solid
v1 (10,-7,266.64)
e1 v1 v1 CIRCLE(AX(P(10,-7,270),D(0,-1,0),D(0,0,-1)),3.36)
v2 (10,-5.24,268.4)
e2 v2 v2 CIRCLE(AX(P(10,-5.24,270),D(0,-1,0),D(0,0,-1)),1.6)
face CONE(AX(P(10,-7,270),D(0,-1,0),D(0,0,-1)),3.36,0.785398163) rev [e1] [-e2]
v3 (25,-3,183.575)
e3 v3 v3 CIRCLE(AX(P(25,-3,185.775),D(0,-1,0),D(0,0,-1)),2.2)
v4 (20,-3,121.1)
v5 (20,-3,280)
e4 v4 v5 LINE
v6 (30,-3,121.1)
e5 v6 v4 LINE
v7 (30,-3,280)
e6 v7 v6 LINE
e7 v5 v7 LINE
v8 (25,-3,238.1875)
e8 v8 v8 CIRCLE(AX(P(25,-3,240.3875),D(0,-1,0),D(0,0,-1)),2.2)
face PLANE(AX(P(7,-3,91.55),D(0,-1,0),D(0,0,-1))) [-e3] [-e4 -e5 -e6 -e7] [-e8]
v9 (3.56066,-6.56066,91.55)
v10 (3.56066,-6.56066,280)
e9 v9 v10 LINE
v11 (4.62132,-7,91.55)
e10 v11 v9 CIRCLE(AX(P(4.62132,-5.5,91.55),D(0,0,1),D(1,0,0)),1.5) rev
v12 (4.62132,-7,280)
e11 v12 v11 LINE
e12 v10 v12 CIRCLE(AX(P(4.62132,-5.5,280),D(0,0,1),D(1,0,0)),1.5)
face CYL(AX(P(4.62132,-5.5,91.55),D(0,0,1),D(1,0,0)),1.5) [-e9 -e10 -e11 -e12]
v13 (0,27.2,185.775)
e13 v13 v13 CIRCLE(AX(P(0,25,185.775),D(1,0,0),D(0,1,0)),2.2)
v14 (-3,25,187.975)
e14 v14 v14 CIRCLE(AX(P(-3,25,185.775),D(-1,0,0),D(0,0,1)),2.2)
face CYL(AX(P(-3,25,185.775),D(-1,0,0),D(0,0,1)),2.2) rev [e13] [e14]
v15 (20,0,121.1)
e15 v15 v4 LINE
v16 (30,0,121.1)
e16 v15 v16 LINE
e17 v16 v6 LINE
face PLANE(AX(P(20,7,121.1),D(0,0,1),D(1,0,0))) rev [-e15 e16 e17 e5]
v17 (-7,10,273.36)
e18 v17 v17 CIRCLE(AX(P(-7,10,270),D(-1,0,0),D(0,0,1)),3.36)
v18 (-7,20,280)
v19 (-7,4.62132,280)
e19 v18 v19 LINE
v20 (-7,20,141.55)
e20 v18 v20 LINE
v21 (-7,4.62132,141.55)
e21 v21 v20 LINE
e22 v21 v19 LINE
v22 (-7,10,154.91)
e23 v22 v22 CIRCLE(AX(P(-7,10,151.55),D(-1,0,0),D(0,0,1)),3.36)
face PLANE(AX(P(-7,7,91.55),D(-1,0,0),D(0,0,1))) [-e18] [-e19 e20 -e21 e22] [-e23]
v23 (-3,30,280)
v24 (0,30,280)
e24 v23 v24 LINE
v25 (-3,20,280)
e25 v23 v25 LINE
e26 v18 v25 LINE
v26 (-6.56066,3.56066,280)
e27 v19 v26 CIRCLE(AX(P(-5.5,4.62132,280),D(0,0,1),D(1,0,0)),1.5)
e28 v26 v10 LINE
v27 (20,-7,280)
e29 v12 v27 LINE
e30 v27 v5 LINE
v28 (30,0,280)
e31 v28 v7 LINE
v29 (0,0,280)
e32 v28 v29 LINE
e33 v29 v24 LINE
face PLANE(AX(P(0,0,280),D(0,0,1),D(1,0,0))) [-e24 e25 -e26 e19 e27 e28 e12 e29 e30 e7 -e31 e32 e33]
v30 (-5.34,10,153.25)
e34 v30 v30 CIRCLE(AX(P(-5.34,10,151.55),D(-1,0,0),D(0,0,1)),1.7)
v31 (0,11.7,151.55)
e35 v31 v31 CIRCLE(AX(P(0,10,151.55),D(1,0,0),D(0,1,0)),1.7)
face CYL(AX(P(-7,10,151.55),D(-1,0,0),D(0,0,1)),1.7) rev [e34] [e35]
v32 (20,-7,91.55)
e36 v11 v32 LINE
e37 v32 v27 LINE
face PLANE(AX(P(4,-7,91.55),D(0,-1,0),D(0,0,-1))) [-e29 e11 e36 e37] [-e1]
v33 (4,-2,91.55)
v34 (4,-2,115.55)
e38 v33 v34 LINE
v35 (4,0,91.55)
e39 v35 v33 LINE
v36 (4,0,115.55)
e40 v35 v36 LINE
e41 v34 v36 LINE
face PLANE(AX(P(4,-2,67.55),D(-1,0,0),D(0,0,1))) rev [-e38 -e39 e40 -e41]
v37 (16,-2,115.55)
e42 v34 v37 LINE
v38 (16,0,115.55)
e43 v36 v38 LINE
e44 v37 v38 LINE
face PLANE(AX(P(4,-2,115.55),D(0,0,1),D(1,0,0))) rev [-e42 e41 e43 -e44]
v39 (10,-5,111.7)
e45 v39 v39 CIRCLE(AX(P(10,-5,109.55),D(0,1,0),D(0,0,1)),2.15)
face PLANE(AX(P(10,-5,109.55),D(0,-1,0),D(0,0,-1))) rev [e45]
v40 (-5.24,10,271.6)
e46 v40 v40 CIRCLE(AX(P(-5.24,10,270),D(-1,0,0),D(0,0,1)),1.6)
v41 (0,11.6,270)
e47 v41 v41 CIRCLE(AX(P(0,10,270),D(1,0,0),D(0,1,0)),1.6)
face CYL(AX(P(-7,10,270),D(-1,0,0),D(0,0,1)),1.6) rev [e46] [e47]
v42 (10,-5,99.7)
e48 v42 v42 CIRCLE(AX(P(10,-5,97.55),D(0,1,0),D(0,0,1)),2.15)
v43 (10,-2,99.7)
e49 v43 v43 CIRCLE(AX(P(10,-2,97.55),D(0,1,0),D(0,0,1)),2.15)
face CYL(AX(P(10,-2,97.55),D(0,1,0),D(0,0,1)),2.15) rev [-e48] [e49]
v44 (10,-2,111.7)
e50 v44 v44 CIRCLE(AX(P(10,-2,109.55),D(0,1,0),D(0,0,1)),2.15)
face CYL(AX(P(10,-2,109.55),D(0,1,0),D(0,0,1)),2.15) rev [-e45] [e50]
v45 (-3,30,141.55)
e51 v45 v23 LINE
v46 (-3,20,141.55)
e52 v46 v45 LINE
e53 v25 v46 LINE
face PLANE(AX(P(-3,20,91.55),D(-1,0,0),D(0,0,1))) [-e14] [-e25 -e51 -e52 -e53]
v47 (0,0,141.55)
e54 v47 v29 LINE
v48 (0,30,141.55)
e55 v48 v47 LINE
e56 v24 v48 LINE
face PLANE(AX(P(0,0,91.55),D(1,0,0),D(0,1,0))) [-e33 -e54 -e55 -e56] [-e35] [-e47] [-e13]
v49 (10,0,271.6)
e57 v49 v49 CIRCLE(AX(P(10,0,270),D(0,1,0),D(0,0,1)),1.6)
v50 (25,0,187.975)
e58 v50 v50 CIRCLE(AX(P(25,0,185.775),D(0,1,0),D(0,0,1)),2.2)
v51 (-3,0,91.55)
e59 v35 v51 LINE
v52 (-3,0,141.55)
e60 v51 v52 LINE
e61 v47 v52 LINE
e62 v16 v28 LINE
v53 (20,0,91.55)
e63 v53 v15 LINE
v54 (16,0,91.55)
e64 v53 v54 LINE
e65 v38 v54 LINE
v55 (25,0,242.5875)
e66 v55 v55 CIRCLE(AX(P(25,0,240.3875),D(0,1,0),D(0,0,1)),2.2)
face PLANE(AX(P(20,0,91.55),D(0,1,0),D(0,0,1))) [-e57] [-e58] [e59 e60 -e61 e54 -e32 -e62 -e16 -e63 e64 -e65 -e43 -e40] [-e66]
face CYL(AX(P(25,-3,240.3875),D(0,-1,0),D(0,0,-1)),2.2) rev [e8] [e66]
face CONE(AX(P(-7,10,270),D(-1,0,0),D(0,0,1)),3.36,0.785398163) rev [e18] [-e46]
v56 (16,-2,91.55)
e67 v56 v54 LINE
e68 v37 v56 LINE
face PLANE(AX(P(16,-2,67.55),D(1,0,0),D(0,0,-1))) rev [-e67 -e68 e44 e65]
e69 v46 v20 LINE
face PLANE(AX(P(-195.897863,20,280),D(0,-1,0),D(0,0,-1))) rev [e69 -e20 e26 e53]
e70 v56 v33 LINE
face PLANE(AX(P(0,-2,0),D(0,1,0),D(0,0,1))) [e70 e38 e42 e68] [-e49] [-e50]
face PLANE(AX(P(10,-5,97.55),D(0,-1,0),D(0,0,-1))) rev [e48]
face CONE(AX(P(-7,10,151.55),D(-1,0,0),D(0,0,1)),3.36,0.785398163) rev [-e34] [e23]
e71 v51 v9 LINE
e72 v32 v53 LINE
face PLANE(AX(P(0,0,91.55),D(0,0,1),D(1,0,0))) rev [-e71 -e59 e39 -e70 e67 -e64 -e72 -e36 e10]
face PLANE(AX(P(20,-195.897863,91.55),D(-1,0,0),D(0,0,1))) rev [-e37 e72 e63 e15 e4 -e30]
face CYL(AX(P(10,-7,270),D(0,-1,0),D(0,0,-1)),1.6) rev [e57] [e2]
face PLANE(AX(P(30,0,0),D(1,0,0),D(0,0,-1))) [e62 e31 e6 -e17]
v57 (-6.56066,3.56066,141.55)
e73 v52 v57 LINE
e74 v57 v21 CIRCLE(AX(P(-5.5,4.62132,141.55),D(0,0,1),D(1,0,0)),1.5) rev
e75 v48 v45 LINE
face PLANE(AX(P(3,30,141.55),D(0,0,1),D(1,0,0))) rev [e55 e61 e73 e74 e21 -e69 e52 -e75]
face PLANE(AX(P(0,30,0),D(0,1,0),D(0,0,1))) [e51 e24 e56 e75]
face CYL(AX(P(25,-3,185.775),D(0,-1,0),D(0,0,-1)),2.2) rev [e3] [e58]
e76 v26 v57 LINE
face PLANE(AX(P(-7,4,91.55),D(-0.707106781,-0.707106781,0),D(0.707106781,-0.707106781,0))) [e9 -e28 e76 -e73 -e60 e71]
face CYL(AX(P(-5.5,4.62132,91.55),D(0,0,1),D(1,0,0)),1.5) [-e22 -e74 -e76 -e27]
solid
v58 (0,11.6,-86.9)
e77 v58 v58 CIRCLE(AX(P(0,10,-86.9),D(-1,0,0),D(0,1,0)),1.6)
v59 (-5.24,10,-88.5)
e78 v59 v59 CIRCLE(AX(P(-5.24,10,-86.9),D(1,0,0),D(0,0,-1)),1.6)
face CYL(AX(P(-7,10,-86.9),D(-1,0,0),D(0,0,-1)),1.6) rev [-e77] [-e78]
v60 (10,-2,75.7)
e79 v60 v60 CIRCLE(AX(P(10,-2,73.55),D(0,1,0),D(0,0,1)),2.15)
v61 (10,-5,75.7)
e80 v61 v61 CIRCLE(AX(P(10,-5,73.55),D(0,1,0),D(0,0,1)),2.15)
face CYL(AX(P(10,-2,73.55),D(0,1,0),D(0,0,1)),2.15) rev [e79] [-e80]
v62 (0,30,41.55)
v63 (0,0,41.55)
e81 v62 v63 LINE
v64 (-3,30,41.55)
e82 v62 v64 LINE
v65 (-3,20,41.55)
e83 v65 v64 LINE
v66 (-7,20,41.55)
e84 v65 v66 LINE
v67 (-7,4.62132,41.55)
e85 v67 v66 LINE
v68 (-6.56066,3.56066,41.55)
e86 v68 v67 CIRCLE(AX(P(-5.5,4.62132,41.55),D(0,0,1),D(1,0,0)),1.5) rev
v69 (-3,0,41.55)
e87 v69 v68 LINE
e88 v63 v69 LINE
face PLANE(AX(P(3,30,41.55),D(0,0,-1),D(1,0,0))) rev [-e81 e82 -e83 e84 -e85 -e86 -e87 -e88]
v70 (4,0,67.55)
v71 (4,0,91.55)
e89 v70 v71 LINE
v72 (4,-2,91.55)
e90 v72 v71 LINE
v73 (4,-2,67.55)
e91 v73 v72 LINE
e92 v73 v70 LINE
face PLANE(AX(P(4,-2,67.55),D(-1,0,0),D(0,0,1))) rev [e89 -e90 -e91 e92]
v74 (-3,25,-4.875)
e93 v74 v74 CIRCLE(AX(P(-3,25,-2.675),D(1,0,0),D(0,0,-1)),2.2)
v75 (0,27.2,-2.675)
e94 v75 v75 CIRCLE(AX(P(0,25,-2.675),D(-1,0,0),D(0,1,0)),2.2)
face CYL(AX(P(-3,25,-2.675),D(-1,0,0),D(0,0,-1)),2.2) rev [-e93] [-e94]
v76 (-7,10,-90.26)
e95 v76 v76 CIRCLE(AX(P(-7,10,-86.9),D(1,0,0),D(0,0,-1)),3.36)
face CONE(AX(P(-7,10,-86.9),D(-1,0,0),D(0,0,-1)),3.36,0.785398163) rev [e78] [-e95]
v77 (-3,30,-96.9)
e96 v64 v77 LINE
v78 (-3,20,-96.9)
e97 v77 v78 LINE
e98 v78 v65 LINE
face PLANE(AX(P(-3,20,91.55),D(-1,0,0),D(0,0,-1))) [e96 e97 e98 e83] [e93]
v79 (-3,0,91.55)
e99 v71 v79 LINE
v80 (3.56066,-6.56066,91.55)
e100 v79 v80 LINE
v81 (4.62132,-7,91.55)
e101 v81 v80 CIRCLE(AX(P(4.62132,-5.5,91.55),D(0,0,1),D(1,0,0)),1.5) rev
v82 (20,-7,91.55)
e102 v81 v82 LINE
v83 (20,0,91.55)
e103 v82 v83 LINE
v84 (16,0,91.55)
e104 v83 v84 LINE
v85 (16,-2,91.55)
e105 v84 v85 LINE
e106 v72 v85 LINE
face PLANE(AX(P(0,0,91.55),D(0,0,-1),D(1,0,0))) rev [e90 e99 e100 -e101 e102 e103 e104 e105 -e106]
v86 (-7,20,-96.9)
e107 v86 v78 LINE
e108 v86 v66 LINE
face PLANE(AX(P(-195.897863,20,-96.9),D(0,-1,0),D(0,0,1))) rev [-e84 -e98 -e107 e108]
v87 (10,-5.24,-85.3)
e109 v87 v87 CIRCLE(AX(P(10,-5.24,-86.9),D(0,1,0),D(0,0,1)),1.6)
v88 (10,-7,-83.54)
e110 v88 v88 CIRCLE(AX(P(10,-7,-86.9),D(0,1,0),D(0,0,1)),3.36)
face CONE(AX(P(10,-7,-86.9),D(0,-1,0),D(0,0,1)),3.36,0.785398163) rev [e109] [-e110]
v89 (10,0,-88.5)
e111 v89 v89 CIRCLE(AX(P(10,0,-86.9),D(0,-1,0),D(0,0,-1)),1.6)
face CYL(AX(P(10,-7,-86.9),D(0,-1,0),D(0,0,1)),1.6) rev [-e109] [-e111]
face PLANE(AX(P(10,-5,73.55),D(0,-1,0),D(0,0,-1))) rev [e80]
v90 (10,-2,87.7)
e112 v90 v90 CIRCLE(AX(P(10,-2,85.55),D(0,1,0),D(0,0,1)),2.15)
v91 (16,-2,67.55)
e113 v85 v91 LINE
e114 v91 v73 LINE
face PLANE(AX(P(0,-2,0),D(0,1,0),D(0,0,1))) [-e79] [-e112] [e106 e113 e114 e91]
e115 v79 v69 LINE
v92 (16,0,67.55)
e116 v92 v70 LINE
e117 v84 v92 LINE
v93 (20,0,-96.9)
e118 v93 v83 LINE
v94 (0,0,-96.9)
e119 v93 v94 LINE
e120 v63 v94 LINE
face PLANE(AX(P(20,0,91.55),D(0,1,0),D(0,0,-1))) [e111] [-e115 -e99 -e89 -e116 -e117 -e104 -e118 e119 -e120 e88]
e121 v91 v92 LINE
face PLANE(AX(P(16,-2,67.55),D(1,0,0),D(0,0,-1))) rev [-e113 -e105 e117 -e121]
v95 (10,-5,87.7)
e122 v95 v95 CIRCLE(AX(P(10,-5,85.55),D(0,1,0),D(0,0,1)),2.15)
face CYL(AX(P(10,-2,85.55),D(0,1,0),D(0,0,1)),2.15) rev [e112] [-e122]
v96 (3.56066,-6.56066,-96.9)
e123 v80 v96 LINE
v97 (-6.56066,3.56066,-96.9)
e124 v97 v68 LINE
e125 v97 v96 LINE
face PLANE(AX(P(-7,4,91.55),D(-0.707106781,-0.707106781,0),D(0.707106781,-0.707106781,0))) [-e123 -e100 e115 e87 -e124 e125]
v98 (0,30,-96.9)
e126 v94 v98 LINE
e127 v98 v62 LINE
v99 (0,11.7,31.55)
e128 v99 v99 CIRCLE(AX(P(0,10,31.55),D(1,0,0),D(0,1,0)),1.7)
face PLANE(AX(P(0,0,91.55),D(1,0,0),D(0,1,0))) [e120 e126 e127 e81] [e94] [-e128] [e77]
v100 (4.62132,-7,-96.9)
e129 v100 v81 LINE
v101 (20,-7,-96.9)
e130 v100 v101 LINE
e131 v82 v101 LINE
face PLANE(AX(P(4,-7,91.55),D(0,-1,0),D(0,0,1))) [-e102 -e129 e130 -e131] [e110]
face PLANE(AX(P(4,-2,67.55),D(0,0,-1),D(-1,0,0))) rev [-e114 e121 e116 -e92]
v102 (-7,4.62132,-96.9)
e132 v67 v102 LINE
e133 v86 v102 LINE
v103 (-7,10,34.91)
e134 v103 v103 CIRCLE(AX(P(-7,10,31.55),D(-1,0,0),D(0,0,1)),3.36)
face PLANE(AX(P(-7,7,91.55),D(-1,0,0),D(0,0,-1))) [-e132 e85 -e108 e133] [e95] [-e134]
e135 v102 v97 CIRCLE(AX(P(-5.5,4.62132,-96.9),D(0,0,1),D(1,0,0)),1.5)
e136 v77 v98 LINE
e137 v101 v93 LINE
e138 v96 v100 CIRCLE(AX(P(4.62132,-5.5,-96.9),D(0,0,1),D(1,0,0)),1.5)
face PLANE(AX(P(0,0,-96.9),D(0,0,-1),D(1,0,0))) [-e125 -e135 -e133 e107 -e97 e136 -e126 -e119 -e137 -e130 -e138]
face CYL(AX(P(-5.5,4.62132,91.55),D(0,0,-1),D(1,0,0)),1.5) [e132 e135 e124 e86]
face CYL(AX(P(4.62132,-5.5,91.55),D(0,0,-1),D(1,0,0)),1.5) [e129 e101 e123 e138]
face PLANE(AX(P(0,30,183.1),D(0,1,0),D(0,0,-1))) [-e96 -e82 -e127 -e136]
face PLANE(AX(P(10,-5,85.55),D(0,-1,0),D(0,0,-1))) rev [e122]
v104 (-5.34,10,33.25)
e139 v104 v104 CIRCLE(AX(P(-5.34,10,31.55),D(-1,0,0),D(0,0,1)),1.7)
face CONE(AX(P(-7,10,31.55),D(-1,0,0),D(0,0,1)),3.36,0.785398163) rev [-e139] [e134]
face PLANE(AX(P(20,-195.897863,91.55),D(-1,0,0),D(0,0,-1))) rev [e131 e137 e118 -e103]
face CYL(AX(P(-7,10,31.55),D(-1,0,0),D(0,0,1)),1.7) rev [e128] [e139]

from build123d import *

# Parameters (mm, degrees)
BOSS_EXTRUDE1_DEPTH                  = 188.45
FILLET1_R                            = 1.5
SKETCH6_W                            = 188.45
SKETCH6_H                            = 3
BOSS_EXTRUDE2_DEPTH                  = 10
SKETCH7_W                            = 13
SKETCH7_H                            = 188.45
BOSS_EXTRUDE3_DEPTH                  = 4
SKETCH8_W                            = 3
SKETCH8_H                            = 188.45
BOSS_EXTRUDE4_DEPTH                  = 10
SKETCH9_W                            = 188.45
SKETCH9_H                            = 13
BOSS_EXTRUDE5_DEPTH                  = 4
CSK_FOR_M3_SFHCS1_D                  = 3.2
CSK_FOR_M3_SFHCS1_CSINK_D            = 6.72
CSK_FOR_M3_SFHCS1_CSINK_ANGLE        = 90
CSK_FOR_M3_SFHCS2_D                  = 3.2
CSK_FOR_M3_SFHCS2_CSINK_D            = 6.72
CSK_FOR_M3_SFHCS2_CSINK_ANGLE        = 90
F_4_4_4_4_DIAMETER_HOLE1_D           = 4.4
F_4_4_4_4_DIAMETER_HOLE1_DEPTH       = 10
F_4_4_4_4_DIAMETER_HOLE1_TIP         = 1.321893362
F_4_4_4_4_DIAMETER_HOLE2_D           = 4.4
F_4_4_4_4_DIAMETER_HOLE2_DEPTH       = 10
F_4_4_4_4_DIAMETER_HOLE2_TIP         = 1.321893362
SKETCH26_W                           = 50
SKETCH26_H                           = 30
CUT_EXTRUDE4_DEPTH                   = 10
SKETCH14_W                           = 10
SKETCH14_H                           = 218
CUT_EXTRUDE1_DEPTH                   = 10
SKETCH22_W                           = 12
SKETCH22_H                           = 48
CUT_EXTRUDE3_DEPTH                   = 2
F_4_3_START                          = -5
F_4_3_4_3_DIAMETER_HOLE2_OUTLINE_R   = 2.15
F_4_3_4_3_DIAMETER_HOLE2_DEPTH       = 3
F_4_3_4_3_DIAMETER_HOLE2_2_OUTLINE_R = 2.15
F_4_3_4_3_DIAMETER_HOLE2_2_DEPTH     = 3


with BuildPart() as part:
    # Sketch1 → Boss-Extrude1 (new body)
    with BuildSketch(Plane.XY.offset(280)):
        Polygon((-7, 4), (4, -7), (7, -7), (7, -3), (20, -3), (20, 0), (0, 0), (0, 20), (-3, 20), (-3, 7), (-7, 7), align=None)
    extrude(amount=-BOSS_EXTRUDE1_DEPTH)

    # Fillet1
    fillet1_edges = [part.edges().sort_by_distance(p)[0] for p in [
        (4, -7, 185.775),
        (-7, 4, 185.775),
    ]]
    fillet(fillet1_edges, radius=FILLET1_R)

    # Sketch6 → Boss-Extrude2 (add)
    with BuildSketch(Plane(origin=(20, 0, 0), x_dir=(0, 0, -1), z_dir=(1, 0, 0))):
        with Locations((-185.775, -1.5)):
            Rectangle(SKETCH6_W, SKETCH6_H)
    extrude(amount=BOSS_EXTRUDE2_DEPTH)

    # Sketch7 → Boss-Extrude3 (add)
    with BuildSketch(Plane.XZ.offset(3)):
        with Locations((13.5, 185.775)):
            Rectangle(SKETCH7_W, SKETCH7_H)
    extrude(amount=BOSS_EXTRUDE3_DEPTH)

    # Sketch8 → Boss-Extrude4 (add)
    with BuildSketch(Plane(origin=(0, 20, 0), x_dir=(1, 0, 0), z_dir=(0, 1, 0))):
        with Locations((-1.5, -185.775)):
            Rectangle(SKETCH8_W, SKETCH8_H)
    extrude(amount=BOSS_EXTRUDE4_DEPTH)

    # Sketch9 → Boss-Extrude5 (add)
    with BuildSketch(Plane.ZY.offset(3)):
        with Locations((185.775, 13.5)):
            Rectangle(SKETCH9_W, SKETCH9_H)
    extrude(amount=BOSS_EXTRUDE5_DEPTH)

    # CSK for M3 SFHCS1 (through all)
    with Locations(Plane.XZ.offset(7)):
        with Locations((10, 270)):
            CounterSinkHole(CSK_FOR_M3_SFHCS1_D / 2, CSK_FOR_M3_SFHCS1_CSINK_D / 2, counter_sink_angle=CSK_FOR_M3_SFHCS1_CSINK_ANGLE)

    # CSK for M3 SFHCS2 (through all)
    with Locations(Plane.ZY.offset(7)):
        with Locations((270, 10)):
            CounterSinkHole(CSK_FOR_M3_SFHCS2_D / 2, CSK_FOR_M3_SFHCS2_CSINK_D / 2, counter_sink_angle=CSK_FOR_M3_SFHCS2_CSINK_ANGLE)

    # Ø4.4 (4.4) Diameter Hole1
    with Locations(Plane.ZY.offset(3)):
        with Locations((185.775, 25)):
            Hole(F_4_4_4_4_DIAMETER_HOLE1_D / 2, depth=F_4_4_4_4_DIAMETER_HOLE1_DEPTH)
            with Locations((0, 0, -(F_4_4_4_4_DIAMETER_HOLE1_DEPTH + F_4_4_4_4_DIAMETER_HOLE1_TIP / 2))):  # 118° drill point
                Cone(0, F_4_4_4_4_DIAMETER_HOLE1_D / 2, F_4_4_4_4_DIAMETER_HOLE1_TIP, mode=Mode.SUBTRACT)

    # Ø4.4 (4.4) Diameter Hole2
    with Locations(Plane.XZ.offset(3)):
        with Locations((25, 240.3875), (25, 185.775)):
            Hole(F_4_4_4_4_DIAMETER_HOLE2_D / 2, depth=F_4_4_4_4_DIAMETER_HOLE2_DEPTH)
            with Locations((0, 0, -(F_4_4_4_4_DIAMETER_HOLE2_DEPTH + F_4_4_4_4_DIAMETER_HOLE2_TIP / 2))):  # 118° drill point
                Cone(0, F_4_4_4_4_DIAMETER_HOLE2_D / 2, F_4_4_4_4_DIAMETER_HOLE2_TIP, mode=Mode.SUBTRACT)

    # Sketch26 → Cut-Extrude4 (cut)
    with BuildSketch(Plane.ZY.offset(7)):
        with Locations((116.55, 15)):
            Rectangle(SKETCH26_W, SKETCH26_H)
    extrude(amount=-CUT_EXTRUDE4_DEPTH, mode=Mode.SUBTRACT)


with BuildPart() as body_2:
    # Mirror1: read off the stored shape, not the designer's step
    # Mirror1: mirrored copy
    add(part.part.mirror(Plane.XY.offset(91.55)))


with BuildPart() as cut_extrude1_tool:
    # Sketch14 → Cut-Extrude1 (new body)
    with BuildSketch(Plane.XZ.offset(3)):
        with Locations((25, 12.1)):
            Rectangle(SKETCH14_W, SKETCH14_H)
    extrude(amount=-CUT_EXTRUDE1_DEPTH)


with BuildPart() as part_1:
    add(part.part)

    # Cut-Extrude1: cut by cut_extrude1_tool
    add(cut_extrude1_tool.part, mode=Mode.SUBTRACT)


with BuildPart() as body_2_1:
    add(body_2.part)

    # Cut-Extrude1: cut by cut_extrude1_tool
    add(cut_extrude1_tool.part, mode=Mode.SUBTRACT)


with BuildPart() as cut_extrude3_tool:
    # Sketch22 → Cut-Extrude3 (new body)
    with BuildSketch(Plane(origin=(0, 0, 0), x_dir=(1, 0, 0), z_dir=(0, 1, 0))):
        with Locations((10, -91.55)):
            Rectangle(SKETCH22_W, SKETCH22_H)
    extrude(amount=-CUT_EXTRUDE3_DEPTH)


with BuildPart() as part_2:
    add(part_1.part)

    # Cut-Extrude3: cut by cut_extrude3_tool
    add(cut_extrude3_tool.part, mode=Mode.SUBTRACT)

    # 4.3 _4.3_ Diameter Hole2 2 outline → 4.3 _4.3_ Diameter Hole2 2 (cut)
    with BuildSketch(Plane(origin=(0, 0, 0), x_dir=(1, 0, 0), z_dir=(0, 1, 0)).offset(F_4_3_START)):
        with Locations((10, -109.55)):
            Circle(F_4_3_4_3_DIAMETER_HOLE2_2_OUTLINE_R)
        with Locations((10, -97.55)):
            Circle(F_4_3_4_3_DIAMETER_HOLE2_2_OUTLINE_R)
    extrude(amount=F_4_3_4_3_DIAMETER_HOLE2_2_DEPTH, mode=Mode.SUBTRACT)

    # CSK for M3 SFHCS3 2 outline → CSK for M3 SFHCS3 2 (revolve, cut)
    with BuildSketch(Plane(origin=(0, 10, 151.55), x_dir=(0, 1, 0), z_dir=(0, 0, -1))):
        Polygon((1.7, -5.34), (1.7, 0), (0, 0), (0, -7), (3.36, -7), align=None)
    revolve(axis=Axis((0, 10, 151.55), (1, 0, 0)), mode=Mode.SUBTRACT)


with BuildPart() as body_2_2:
    add(body_2_1.part)

    # Cut-Extrude3: cut by cut_extrude3_tool
    add(cut_extrude3_tool.part, mode=Mode.SUBTRACT)

    # Ø4.3 (4.3) Diameter Hole2: read off the stored shape, not the designer's step
    # Ø4.3 (4.3) Diameter Hole2 outline → Ø4.3 (4.3) Diameter Hole2 (cut)
    with BuildSketch(Plane(origin=(0, 0, 0), x_dir=(1, 0, 0), z_dir=(0, 1, 0)).offset(F_4_3_START)):
        with Locations((10, -85.55)):
            Circle(F_4_3_4_3_DIAMETER_HOLE2_OUTLINE_R)
        with Locations((10, -73.55)):
            Circle(F_4_3_4_3_DIAMETER_HOLE2_OUTLINE_R)
    extrude(amount=F_4_3_4_3_DIAMETER_HOLE2_DEPTH, mode=Mode.SUBTRACT)

    # CSK for M3 SFHCS3: read off the stored shape, not the designer's step
    # CSK for M3 SFHCS3 outline → CSK for M3 SFHCS3 (revolve, cut)
    with BuildSketch(Plane(origin=(0, 10, 31.55), x_dir=(0, 1, 0), z_dir=(0, 0, -1))):
        Polygon((1.7, -5.34), (1.7, 0), (0, 0), (0, -7), (3.36, -7), align=None)
    revolve(axis=Axis((0, 10, 31.55), (1, 0, 0)), mode=Mode.SUBTRACT)


solid = Compound([part_2.part, body_2_2.part])
